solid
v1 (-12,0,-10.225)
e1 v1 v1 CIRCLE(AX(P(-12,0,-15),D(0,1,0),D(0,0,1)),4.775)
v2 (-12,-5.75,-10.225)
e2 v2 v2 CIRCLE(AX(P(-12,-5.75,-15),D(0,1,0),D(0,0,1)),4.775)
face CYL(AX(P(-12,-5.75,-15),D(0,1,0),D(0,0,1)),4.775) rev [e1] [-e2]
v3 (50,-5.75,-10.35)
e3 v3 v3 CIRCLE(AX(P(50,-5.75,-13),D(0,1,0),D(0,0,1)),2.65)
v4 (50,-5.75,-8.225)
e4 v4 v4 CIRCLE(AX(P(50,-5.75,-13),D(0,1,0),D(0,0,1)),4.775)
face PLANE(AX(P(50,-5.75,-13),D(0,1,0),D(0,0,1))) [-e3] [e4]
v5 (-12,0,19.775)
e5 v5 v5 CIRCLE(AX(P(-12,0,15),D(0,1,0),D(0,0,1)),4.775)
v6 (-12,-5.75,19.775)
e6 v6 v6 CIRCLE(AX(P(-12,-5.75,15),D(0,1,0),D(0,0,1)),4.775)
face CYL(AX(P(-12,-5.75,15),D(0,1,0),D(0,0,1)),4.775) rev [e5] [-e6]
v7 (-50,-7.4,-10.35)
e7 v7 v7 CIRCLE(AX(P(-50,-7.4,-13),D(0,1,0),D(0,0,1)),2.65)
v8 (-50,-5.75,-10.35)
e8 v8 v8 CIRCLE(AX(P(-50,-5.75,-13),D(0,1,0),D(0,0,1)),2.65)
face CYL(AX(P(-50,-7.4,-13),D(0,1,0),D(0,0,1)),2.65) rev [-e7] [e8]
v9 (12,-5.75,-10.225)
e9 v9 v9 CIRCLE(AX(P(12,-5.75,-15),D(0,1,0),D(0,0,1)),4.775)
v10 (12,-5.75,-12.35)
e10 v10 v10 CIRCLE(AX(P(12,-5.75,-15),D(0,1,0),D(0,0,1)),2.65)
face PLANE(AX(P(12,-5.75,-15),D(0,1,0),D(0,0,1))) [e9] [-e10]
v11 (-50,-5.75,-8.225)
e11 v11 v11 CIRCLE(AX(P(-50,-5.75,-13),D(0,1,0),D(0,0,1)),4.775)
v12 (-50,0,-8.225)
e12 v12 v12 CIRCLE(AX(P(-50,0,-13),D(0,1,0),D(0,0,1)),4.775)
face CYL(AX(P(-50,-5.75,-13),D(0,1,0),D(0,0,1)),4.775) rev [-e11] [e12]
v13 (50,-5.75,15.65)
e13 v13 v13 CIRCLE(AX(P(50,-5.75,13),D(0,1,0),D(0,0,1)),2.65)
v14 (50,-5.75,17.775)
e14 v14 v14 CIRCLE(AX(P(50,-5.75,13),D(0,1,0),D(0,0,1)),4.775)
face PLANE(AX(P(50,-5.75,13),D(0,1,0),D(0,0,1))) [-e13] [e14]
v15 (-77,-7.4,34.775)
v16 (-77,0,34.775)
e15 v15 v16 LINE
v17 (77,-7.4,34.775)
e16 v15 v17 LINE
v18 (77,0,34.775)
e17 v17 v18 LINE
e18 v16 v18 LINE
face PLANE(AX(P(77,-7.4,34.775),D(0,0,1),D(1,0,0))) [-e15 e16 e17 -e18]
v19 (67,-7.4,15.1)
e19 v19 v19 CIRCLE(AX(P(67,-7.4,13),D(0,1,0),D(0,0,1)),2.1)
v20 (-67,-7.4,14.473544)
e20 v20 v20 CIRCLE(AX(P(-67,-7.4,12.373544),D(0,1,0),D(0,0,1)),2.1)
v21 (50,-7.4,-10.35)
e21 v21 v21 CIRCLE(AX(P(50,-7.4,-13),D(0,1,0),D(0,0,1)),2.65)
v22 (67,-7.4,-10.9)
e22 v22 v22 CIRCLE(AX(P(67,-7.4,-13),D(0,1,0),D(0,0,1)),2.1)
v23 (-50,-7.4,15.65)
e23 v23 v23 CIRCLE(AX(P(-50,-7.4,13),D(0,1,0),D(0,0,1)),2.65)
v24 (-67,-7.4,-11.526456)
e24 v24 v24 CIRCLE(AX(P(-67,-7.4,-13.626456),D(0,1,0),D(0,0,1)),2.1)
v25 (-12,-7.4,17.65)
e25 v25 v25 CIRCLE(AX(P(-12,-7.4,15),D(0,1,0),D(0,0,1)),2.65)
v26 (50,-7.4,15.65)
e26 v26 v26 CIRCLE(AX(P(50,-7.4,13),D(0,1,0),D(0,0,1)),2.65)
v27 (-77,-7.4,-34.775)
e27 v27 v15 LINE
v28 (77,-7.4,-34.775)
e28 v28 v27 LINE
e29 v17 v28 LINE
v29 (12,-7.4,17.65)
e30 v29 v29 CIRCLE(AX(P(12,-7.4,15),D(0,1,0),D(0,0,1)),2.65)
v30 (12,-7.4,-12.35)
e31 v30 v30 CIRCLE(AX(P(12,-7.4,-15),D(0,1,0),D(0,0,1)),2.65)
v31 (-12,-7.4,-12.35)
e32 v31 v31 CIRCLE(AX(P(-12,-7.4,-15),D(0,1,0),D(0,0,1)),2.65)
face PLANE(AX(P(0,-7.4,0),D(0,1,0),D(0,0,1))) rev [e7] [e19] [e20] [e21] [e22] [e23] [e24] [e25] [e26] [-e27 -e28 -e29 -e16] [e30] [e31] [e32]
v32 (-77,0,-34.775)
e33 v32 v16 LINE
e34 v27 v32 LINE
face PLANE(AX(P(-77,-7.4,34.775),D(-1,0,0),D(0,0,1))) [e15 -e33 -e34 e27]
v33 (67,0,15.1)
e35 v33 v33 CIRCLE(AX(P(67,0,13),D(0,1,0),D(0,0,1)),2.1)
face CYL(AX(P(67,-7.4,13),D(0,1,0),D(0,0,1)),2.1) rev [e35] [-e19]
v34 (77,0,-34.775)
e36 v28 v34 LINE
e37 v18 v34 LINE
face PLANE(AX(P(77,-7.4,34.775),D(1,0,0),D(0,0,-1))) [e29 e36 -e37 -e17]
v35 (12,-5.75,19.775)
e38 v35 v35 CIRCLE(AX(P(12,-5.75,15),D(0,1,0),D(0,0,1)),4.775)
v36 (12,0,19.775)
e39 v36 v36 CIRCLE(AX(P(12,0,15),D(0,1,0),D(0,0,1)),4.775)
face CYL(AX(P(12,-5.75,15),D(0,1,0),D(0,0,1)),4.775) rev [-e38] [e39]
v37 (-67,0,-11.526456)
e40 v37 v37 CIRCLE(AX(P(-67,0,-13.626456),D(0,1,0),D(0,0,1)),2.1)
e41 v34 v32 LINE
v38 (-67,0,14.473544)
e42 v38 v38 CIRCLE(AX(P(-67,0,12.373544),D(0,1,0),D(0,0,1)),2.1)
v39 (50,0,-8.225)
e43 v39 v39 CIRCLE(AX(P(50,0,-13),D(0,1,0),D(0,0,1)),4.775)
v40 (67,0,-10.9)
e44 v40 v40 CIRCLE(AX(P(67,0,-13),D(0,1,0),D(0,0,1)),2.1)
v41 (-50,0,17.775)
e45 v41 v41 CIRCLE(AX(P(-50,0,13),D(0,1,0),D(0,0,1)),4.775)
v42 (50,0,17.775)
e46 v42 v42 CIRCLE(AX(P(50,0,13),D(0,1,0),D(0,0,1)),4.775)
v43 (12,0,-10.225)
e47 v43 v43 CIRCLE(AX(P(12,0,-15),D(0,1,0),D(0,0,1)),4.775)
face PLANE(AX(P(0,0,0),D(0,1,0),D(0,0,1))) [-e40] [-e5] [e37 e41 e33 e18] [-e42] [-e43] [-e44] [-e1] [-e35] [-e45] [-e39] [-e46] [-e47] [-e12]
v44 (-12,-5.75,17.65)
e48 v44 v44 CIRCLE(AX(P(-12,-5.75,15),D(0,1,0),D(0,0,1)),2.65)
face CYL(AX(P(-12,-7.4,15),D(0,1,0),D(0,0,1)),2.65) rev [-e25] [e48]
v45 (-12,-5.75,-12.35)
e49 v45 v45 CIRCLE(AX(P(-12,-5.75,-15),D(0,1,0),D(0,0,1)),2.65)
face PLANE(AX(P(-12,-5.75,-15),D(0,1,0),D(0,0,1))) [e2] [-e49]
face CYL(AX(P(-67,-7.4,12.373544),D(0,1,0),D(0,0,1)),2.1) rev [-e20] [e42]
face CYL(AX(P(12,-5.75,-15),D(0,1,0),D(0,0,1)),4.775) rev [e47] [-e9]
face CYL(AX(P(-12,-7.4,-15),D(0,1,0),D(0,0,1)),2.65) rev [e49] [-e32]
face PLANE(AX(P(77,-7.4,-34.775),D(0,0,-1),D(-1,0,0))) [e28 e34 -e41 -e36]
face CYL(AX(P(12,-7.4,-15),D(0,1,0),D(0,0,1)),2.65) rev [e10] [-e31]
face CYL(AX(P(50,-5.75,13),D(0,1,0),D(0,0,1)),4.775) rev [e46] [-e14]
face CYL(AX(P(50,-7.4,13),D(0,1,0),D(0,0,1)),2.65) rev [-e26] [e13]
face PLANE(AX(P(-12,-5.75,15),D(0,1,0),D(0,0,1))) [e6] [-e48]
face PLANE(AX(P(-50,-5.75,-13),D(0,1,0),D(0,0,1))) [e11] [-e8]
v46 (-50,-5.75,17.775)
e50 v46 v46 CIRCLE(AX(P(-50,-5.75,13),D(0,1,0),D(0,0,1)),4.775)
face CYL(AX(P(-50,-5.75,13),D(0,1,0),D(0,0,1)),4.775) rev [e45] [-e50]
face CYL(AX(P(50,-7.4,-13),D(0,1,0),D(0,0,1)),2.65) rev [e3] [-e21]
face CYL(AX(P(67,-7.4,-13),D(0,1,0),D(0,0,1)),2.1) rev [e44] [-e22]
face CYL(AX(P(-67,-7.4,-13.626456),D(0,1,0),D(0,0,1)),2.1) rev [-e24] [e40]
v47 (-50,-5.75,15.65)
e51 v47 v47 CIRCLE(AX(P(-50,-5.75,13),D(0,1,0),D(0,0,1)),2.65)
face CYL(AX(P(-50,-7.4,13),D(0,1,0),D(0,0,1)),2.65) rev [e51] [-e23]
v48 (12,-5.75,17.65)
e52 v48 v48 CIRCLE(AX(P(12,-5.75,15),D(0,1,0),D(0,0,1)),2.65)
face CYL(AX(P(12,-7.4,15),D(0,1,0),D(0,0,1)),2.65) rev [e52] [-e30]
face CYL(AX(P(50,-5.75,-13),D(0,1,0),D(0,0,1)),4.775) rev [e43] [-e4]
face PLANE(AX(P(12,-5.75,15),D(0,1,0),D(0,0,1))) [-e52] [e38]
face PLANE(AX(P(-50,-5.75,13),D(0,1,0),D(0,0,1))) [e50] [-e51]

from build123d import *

# Parameters (mm, degrees)
ESBO_O1_W             = 154
ESBO_O1_H             = 69.55
FLANGE_BASE1_DEPTH    = 7.4
ESBO_O6_R             = 4.775
CORTE_EXTRUS_O1_DEPTH = 5.75
ESBO_O8_R             = 2.65
CORTE_EXTRUS_O3_DEPTH = 85.683901215
ESBO_O10_R            = 2.1
CORTE_EXTRUS_O4_DEPTH = 85.811913226


# Sheet-metal steps are written as plain solids
with BuildPart() as part:
    # Esboço1 → Flange-base1 (new body)
    with BuildSketch(Plane(origin=(0, 0, 0), x_dir=(1, 0, 0), z_dir=(0, 1, 0))):
        Rectangle(ESBO_O1_W, ESBO_O1_H)
    extrude(amount=-FLANGE_BASE1_DEPTH)

    # Esboço6 → Corte-extrusão1 (cut)
    with BuildSketch(Plane(origin=(0, 0, 0), x_dir=(1, 0, 0), z_dir=(0, 1, 0))):
        with Locations(Location((-50, 13, 0), (0, 0, 270))):
            Circle(ESBO_O6_R)
        with Locations(Location((-50, -13, 0), (0, 0, 270))):
            Circle(ESBO_O6_R)
        with Locations(Location((-12, 15, 0), (0, 0, 270))):
            Circle(ESBO_O6_R)
        with Locations(Location((12, 15, 0), (0, 0, 270))):
            Circle(ESBO_O6_R)
        with Locations(Location((12, -15, 0), (0, 0, 270))):
            Circle(ESBO_O6_R)
        with Locations(Location((50, 13, 0), (0, 0, 270))):
            Circle(ESBO_O6_R)
        with Locations(Location((50, -13, 0), (0, 0, 270))):
            Circle(ESBO_O6_R)
        with Locations(Location((-12, -15, 0), (0, 0, 270))):
            Circle(ESBO_O6_R)
    extrude(amount=-CORTE_EXTRUS_O1_DEPTH, mode=Mode.SUBTRACT)

    # Esboço8 → Corte-extrusão3 (cut, through all)
    with BuildSketch(Plane(origin=(0, -5.75, 0), x_dir=(1, 0, 0), z_dir=(0, 1, 0))):
        with Locations(Location((-50, 13, 0), (0, 0, 270))):
            Circle(ESBO_O8_R)
        with Locations(Location((-50, -13, 0), (0, 0, 270))):
            Circle(ESBO_O8_R)
        with Locations(Location((-12, 15, 0), (0, 0, 270))):
            Circle(ESBO_O8_R)
        with Locations(Location((12, 15, 0), (0, 0, 270))):
            Circle(ESBO_O8_R)
        with Locations(Location((12, -15, 0), (0, 0, 270))):
            Circle(ESBO_O8_R)
        with Locations(Location((50, 13, 0), (0, 0, 270))):
            Circle(ESBO_O8_R)
        with Locations(Location((50, -13, 0), (0, 0, 270))):
            Circle(ESBO_O8_R)
        with Locations(Location((-12, -15, 0), (0, 0, 270))):
            Circle(ESBO_O8_R)
    extrude(amount=-CORTE_EXTRUS_O3_DEPTH, mode=Mode.SUBTRACT)

    # Esboço10 → Corte-extrusão4 (cut, through all)
    with BuildSketch(Plane(origin=(0, 0, 0), x_dir=(1, 0, 0), z_dir=(0, 1, 0))):
        with Locations(Location((-67, 13.626456062, 0), (0, 0, 270))):
            Circle(ESBO_O10_R)
        with Locations(Location((-67, -12.373543938, 0), (0, 0, 270))):
            Circle(ESBO_O10_R)
        with Locations(Location((67, 13, 0), (0, 0, 270))):
            Circle(ESBO_O10_R)
        with Locations(Location((67, -13, 0), (0, 0, 270))):
            Circle(ESBO_O10_R)
    extrude(amount=-CORTE_EXTRUS_O4_DEPTH, mode=Mode.SUBTRACT)


solid = part.part
